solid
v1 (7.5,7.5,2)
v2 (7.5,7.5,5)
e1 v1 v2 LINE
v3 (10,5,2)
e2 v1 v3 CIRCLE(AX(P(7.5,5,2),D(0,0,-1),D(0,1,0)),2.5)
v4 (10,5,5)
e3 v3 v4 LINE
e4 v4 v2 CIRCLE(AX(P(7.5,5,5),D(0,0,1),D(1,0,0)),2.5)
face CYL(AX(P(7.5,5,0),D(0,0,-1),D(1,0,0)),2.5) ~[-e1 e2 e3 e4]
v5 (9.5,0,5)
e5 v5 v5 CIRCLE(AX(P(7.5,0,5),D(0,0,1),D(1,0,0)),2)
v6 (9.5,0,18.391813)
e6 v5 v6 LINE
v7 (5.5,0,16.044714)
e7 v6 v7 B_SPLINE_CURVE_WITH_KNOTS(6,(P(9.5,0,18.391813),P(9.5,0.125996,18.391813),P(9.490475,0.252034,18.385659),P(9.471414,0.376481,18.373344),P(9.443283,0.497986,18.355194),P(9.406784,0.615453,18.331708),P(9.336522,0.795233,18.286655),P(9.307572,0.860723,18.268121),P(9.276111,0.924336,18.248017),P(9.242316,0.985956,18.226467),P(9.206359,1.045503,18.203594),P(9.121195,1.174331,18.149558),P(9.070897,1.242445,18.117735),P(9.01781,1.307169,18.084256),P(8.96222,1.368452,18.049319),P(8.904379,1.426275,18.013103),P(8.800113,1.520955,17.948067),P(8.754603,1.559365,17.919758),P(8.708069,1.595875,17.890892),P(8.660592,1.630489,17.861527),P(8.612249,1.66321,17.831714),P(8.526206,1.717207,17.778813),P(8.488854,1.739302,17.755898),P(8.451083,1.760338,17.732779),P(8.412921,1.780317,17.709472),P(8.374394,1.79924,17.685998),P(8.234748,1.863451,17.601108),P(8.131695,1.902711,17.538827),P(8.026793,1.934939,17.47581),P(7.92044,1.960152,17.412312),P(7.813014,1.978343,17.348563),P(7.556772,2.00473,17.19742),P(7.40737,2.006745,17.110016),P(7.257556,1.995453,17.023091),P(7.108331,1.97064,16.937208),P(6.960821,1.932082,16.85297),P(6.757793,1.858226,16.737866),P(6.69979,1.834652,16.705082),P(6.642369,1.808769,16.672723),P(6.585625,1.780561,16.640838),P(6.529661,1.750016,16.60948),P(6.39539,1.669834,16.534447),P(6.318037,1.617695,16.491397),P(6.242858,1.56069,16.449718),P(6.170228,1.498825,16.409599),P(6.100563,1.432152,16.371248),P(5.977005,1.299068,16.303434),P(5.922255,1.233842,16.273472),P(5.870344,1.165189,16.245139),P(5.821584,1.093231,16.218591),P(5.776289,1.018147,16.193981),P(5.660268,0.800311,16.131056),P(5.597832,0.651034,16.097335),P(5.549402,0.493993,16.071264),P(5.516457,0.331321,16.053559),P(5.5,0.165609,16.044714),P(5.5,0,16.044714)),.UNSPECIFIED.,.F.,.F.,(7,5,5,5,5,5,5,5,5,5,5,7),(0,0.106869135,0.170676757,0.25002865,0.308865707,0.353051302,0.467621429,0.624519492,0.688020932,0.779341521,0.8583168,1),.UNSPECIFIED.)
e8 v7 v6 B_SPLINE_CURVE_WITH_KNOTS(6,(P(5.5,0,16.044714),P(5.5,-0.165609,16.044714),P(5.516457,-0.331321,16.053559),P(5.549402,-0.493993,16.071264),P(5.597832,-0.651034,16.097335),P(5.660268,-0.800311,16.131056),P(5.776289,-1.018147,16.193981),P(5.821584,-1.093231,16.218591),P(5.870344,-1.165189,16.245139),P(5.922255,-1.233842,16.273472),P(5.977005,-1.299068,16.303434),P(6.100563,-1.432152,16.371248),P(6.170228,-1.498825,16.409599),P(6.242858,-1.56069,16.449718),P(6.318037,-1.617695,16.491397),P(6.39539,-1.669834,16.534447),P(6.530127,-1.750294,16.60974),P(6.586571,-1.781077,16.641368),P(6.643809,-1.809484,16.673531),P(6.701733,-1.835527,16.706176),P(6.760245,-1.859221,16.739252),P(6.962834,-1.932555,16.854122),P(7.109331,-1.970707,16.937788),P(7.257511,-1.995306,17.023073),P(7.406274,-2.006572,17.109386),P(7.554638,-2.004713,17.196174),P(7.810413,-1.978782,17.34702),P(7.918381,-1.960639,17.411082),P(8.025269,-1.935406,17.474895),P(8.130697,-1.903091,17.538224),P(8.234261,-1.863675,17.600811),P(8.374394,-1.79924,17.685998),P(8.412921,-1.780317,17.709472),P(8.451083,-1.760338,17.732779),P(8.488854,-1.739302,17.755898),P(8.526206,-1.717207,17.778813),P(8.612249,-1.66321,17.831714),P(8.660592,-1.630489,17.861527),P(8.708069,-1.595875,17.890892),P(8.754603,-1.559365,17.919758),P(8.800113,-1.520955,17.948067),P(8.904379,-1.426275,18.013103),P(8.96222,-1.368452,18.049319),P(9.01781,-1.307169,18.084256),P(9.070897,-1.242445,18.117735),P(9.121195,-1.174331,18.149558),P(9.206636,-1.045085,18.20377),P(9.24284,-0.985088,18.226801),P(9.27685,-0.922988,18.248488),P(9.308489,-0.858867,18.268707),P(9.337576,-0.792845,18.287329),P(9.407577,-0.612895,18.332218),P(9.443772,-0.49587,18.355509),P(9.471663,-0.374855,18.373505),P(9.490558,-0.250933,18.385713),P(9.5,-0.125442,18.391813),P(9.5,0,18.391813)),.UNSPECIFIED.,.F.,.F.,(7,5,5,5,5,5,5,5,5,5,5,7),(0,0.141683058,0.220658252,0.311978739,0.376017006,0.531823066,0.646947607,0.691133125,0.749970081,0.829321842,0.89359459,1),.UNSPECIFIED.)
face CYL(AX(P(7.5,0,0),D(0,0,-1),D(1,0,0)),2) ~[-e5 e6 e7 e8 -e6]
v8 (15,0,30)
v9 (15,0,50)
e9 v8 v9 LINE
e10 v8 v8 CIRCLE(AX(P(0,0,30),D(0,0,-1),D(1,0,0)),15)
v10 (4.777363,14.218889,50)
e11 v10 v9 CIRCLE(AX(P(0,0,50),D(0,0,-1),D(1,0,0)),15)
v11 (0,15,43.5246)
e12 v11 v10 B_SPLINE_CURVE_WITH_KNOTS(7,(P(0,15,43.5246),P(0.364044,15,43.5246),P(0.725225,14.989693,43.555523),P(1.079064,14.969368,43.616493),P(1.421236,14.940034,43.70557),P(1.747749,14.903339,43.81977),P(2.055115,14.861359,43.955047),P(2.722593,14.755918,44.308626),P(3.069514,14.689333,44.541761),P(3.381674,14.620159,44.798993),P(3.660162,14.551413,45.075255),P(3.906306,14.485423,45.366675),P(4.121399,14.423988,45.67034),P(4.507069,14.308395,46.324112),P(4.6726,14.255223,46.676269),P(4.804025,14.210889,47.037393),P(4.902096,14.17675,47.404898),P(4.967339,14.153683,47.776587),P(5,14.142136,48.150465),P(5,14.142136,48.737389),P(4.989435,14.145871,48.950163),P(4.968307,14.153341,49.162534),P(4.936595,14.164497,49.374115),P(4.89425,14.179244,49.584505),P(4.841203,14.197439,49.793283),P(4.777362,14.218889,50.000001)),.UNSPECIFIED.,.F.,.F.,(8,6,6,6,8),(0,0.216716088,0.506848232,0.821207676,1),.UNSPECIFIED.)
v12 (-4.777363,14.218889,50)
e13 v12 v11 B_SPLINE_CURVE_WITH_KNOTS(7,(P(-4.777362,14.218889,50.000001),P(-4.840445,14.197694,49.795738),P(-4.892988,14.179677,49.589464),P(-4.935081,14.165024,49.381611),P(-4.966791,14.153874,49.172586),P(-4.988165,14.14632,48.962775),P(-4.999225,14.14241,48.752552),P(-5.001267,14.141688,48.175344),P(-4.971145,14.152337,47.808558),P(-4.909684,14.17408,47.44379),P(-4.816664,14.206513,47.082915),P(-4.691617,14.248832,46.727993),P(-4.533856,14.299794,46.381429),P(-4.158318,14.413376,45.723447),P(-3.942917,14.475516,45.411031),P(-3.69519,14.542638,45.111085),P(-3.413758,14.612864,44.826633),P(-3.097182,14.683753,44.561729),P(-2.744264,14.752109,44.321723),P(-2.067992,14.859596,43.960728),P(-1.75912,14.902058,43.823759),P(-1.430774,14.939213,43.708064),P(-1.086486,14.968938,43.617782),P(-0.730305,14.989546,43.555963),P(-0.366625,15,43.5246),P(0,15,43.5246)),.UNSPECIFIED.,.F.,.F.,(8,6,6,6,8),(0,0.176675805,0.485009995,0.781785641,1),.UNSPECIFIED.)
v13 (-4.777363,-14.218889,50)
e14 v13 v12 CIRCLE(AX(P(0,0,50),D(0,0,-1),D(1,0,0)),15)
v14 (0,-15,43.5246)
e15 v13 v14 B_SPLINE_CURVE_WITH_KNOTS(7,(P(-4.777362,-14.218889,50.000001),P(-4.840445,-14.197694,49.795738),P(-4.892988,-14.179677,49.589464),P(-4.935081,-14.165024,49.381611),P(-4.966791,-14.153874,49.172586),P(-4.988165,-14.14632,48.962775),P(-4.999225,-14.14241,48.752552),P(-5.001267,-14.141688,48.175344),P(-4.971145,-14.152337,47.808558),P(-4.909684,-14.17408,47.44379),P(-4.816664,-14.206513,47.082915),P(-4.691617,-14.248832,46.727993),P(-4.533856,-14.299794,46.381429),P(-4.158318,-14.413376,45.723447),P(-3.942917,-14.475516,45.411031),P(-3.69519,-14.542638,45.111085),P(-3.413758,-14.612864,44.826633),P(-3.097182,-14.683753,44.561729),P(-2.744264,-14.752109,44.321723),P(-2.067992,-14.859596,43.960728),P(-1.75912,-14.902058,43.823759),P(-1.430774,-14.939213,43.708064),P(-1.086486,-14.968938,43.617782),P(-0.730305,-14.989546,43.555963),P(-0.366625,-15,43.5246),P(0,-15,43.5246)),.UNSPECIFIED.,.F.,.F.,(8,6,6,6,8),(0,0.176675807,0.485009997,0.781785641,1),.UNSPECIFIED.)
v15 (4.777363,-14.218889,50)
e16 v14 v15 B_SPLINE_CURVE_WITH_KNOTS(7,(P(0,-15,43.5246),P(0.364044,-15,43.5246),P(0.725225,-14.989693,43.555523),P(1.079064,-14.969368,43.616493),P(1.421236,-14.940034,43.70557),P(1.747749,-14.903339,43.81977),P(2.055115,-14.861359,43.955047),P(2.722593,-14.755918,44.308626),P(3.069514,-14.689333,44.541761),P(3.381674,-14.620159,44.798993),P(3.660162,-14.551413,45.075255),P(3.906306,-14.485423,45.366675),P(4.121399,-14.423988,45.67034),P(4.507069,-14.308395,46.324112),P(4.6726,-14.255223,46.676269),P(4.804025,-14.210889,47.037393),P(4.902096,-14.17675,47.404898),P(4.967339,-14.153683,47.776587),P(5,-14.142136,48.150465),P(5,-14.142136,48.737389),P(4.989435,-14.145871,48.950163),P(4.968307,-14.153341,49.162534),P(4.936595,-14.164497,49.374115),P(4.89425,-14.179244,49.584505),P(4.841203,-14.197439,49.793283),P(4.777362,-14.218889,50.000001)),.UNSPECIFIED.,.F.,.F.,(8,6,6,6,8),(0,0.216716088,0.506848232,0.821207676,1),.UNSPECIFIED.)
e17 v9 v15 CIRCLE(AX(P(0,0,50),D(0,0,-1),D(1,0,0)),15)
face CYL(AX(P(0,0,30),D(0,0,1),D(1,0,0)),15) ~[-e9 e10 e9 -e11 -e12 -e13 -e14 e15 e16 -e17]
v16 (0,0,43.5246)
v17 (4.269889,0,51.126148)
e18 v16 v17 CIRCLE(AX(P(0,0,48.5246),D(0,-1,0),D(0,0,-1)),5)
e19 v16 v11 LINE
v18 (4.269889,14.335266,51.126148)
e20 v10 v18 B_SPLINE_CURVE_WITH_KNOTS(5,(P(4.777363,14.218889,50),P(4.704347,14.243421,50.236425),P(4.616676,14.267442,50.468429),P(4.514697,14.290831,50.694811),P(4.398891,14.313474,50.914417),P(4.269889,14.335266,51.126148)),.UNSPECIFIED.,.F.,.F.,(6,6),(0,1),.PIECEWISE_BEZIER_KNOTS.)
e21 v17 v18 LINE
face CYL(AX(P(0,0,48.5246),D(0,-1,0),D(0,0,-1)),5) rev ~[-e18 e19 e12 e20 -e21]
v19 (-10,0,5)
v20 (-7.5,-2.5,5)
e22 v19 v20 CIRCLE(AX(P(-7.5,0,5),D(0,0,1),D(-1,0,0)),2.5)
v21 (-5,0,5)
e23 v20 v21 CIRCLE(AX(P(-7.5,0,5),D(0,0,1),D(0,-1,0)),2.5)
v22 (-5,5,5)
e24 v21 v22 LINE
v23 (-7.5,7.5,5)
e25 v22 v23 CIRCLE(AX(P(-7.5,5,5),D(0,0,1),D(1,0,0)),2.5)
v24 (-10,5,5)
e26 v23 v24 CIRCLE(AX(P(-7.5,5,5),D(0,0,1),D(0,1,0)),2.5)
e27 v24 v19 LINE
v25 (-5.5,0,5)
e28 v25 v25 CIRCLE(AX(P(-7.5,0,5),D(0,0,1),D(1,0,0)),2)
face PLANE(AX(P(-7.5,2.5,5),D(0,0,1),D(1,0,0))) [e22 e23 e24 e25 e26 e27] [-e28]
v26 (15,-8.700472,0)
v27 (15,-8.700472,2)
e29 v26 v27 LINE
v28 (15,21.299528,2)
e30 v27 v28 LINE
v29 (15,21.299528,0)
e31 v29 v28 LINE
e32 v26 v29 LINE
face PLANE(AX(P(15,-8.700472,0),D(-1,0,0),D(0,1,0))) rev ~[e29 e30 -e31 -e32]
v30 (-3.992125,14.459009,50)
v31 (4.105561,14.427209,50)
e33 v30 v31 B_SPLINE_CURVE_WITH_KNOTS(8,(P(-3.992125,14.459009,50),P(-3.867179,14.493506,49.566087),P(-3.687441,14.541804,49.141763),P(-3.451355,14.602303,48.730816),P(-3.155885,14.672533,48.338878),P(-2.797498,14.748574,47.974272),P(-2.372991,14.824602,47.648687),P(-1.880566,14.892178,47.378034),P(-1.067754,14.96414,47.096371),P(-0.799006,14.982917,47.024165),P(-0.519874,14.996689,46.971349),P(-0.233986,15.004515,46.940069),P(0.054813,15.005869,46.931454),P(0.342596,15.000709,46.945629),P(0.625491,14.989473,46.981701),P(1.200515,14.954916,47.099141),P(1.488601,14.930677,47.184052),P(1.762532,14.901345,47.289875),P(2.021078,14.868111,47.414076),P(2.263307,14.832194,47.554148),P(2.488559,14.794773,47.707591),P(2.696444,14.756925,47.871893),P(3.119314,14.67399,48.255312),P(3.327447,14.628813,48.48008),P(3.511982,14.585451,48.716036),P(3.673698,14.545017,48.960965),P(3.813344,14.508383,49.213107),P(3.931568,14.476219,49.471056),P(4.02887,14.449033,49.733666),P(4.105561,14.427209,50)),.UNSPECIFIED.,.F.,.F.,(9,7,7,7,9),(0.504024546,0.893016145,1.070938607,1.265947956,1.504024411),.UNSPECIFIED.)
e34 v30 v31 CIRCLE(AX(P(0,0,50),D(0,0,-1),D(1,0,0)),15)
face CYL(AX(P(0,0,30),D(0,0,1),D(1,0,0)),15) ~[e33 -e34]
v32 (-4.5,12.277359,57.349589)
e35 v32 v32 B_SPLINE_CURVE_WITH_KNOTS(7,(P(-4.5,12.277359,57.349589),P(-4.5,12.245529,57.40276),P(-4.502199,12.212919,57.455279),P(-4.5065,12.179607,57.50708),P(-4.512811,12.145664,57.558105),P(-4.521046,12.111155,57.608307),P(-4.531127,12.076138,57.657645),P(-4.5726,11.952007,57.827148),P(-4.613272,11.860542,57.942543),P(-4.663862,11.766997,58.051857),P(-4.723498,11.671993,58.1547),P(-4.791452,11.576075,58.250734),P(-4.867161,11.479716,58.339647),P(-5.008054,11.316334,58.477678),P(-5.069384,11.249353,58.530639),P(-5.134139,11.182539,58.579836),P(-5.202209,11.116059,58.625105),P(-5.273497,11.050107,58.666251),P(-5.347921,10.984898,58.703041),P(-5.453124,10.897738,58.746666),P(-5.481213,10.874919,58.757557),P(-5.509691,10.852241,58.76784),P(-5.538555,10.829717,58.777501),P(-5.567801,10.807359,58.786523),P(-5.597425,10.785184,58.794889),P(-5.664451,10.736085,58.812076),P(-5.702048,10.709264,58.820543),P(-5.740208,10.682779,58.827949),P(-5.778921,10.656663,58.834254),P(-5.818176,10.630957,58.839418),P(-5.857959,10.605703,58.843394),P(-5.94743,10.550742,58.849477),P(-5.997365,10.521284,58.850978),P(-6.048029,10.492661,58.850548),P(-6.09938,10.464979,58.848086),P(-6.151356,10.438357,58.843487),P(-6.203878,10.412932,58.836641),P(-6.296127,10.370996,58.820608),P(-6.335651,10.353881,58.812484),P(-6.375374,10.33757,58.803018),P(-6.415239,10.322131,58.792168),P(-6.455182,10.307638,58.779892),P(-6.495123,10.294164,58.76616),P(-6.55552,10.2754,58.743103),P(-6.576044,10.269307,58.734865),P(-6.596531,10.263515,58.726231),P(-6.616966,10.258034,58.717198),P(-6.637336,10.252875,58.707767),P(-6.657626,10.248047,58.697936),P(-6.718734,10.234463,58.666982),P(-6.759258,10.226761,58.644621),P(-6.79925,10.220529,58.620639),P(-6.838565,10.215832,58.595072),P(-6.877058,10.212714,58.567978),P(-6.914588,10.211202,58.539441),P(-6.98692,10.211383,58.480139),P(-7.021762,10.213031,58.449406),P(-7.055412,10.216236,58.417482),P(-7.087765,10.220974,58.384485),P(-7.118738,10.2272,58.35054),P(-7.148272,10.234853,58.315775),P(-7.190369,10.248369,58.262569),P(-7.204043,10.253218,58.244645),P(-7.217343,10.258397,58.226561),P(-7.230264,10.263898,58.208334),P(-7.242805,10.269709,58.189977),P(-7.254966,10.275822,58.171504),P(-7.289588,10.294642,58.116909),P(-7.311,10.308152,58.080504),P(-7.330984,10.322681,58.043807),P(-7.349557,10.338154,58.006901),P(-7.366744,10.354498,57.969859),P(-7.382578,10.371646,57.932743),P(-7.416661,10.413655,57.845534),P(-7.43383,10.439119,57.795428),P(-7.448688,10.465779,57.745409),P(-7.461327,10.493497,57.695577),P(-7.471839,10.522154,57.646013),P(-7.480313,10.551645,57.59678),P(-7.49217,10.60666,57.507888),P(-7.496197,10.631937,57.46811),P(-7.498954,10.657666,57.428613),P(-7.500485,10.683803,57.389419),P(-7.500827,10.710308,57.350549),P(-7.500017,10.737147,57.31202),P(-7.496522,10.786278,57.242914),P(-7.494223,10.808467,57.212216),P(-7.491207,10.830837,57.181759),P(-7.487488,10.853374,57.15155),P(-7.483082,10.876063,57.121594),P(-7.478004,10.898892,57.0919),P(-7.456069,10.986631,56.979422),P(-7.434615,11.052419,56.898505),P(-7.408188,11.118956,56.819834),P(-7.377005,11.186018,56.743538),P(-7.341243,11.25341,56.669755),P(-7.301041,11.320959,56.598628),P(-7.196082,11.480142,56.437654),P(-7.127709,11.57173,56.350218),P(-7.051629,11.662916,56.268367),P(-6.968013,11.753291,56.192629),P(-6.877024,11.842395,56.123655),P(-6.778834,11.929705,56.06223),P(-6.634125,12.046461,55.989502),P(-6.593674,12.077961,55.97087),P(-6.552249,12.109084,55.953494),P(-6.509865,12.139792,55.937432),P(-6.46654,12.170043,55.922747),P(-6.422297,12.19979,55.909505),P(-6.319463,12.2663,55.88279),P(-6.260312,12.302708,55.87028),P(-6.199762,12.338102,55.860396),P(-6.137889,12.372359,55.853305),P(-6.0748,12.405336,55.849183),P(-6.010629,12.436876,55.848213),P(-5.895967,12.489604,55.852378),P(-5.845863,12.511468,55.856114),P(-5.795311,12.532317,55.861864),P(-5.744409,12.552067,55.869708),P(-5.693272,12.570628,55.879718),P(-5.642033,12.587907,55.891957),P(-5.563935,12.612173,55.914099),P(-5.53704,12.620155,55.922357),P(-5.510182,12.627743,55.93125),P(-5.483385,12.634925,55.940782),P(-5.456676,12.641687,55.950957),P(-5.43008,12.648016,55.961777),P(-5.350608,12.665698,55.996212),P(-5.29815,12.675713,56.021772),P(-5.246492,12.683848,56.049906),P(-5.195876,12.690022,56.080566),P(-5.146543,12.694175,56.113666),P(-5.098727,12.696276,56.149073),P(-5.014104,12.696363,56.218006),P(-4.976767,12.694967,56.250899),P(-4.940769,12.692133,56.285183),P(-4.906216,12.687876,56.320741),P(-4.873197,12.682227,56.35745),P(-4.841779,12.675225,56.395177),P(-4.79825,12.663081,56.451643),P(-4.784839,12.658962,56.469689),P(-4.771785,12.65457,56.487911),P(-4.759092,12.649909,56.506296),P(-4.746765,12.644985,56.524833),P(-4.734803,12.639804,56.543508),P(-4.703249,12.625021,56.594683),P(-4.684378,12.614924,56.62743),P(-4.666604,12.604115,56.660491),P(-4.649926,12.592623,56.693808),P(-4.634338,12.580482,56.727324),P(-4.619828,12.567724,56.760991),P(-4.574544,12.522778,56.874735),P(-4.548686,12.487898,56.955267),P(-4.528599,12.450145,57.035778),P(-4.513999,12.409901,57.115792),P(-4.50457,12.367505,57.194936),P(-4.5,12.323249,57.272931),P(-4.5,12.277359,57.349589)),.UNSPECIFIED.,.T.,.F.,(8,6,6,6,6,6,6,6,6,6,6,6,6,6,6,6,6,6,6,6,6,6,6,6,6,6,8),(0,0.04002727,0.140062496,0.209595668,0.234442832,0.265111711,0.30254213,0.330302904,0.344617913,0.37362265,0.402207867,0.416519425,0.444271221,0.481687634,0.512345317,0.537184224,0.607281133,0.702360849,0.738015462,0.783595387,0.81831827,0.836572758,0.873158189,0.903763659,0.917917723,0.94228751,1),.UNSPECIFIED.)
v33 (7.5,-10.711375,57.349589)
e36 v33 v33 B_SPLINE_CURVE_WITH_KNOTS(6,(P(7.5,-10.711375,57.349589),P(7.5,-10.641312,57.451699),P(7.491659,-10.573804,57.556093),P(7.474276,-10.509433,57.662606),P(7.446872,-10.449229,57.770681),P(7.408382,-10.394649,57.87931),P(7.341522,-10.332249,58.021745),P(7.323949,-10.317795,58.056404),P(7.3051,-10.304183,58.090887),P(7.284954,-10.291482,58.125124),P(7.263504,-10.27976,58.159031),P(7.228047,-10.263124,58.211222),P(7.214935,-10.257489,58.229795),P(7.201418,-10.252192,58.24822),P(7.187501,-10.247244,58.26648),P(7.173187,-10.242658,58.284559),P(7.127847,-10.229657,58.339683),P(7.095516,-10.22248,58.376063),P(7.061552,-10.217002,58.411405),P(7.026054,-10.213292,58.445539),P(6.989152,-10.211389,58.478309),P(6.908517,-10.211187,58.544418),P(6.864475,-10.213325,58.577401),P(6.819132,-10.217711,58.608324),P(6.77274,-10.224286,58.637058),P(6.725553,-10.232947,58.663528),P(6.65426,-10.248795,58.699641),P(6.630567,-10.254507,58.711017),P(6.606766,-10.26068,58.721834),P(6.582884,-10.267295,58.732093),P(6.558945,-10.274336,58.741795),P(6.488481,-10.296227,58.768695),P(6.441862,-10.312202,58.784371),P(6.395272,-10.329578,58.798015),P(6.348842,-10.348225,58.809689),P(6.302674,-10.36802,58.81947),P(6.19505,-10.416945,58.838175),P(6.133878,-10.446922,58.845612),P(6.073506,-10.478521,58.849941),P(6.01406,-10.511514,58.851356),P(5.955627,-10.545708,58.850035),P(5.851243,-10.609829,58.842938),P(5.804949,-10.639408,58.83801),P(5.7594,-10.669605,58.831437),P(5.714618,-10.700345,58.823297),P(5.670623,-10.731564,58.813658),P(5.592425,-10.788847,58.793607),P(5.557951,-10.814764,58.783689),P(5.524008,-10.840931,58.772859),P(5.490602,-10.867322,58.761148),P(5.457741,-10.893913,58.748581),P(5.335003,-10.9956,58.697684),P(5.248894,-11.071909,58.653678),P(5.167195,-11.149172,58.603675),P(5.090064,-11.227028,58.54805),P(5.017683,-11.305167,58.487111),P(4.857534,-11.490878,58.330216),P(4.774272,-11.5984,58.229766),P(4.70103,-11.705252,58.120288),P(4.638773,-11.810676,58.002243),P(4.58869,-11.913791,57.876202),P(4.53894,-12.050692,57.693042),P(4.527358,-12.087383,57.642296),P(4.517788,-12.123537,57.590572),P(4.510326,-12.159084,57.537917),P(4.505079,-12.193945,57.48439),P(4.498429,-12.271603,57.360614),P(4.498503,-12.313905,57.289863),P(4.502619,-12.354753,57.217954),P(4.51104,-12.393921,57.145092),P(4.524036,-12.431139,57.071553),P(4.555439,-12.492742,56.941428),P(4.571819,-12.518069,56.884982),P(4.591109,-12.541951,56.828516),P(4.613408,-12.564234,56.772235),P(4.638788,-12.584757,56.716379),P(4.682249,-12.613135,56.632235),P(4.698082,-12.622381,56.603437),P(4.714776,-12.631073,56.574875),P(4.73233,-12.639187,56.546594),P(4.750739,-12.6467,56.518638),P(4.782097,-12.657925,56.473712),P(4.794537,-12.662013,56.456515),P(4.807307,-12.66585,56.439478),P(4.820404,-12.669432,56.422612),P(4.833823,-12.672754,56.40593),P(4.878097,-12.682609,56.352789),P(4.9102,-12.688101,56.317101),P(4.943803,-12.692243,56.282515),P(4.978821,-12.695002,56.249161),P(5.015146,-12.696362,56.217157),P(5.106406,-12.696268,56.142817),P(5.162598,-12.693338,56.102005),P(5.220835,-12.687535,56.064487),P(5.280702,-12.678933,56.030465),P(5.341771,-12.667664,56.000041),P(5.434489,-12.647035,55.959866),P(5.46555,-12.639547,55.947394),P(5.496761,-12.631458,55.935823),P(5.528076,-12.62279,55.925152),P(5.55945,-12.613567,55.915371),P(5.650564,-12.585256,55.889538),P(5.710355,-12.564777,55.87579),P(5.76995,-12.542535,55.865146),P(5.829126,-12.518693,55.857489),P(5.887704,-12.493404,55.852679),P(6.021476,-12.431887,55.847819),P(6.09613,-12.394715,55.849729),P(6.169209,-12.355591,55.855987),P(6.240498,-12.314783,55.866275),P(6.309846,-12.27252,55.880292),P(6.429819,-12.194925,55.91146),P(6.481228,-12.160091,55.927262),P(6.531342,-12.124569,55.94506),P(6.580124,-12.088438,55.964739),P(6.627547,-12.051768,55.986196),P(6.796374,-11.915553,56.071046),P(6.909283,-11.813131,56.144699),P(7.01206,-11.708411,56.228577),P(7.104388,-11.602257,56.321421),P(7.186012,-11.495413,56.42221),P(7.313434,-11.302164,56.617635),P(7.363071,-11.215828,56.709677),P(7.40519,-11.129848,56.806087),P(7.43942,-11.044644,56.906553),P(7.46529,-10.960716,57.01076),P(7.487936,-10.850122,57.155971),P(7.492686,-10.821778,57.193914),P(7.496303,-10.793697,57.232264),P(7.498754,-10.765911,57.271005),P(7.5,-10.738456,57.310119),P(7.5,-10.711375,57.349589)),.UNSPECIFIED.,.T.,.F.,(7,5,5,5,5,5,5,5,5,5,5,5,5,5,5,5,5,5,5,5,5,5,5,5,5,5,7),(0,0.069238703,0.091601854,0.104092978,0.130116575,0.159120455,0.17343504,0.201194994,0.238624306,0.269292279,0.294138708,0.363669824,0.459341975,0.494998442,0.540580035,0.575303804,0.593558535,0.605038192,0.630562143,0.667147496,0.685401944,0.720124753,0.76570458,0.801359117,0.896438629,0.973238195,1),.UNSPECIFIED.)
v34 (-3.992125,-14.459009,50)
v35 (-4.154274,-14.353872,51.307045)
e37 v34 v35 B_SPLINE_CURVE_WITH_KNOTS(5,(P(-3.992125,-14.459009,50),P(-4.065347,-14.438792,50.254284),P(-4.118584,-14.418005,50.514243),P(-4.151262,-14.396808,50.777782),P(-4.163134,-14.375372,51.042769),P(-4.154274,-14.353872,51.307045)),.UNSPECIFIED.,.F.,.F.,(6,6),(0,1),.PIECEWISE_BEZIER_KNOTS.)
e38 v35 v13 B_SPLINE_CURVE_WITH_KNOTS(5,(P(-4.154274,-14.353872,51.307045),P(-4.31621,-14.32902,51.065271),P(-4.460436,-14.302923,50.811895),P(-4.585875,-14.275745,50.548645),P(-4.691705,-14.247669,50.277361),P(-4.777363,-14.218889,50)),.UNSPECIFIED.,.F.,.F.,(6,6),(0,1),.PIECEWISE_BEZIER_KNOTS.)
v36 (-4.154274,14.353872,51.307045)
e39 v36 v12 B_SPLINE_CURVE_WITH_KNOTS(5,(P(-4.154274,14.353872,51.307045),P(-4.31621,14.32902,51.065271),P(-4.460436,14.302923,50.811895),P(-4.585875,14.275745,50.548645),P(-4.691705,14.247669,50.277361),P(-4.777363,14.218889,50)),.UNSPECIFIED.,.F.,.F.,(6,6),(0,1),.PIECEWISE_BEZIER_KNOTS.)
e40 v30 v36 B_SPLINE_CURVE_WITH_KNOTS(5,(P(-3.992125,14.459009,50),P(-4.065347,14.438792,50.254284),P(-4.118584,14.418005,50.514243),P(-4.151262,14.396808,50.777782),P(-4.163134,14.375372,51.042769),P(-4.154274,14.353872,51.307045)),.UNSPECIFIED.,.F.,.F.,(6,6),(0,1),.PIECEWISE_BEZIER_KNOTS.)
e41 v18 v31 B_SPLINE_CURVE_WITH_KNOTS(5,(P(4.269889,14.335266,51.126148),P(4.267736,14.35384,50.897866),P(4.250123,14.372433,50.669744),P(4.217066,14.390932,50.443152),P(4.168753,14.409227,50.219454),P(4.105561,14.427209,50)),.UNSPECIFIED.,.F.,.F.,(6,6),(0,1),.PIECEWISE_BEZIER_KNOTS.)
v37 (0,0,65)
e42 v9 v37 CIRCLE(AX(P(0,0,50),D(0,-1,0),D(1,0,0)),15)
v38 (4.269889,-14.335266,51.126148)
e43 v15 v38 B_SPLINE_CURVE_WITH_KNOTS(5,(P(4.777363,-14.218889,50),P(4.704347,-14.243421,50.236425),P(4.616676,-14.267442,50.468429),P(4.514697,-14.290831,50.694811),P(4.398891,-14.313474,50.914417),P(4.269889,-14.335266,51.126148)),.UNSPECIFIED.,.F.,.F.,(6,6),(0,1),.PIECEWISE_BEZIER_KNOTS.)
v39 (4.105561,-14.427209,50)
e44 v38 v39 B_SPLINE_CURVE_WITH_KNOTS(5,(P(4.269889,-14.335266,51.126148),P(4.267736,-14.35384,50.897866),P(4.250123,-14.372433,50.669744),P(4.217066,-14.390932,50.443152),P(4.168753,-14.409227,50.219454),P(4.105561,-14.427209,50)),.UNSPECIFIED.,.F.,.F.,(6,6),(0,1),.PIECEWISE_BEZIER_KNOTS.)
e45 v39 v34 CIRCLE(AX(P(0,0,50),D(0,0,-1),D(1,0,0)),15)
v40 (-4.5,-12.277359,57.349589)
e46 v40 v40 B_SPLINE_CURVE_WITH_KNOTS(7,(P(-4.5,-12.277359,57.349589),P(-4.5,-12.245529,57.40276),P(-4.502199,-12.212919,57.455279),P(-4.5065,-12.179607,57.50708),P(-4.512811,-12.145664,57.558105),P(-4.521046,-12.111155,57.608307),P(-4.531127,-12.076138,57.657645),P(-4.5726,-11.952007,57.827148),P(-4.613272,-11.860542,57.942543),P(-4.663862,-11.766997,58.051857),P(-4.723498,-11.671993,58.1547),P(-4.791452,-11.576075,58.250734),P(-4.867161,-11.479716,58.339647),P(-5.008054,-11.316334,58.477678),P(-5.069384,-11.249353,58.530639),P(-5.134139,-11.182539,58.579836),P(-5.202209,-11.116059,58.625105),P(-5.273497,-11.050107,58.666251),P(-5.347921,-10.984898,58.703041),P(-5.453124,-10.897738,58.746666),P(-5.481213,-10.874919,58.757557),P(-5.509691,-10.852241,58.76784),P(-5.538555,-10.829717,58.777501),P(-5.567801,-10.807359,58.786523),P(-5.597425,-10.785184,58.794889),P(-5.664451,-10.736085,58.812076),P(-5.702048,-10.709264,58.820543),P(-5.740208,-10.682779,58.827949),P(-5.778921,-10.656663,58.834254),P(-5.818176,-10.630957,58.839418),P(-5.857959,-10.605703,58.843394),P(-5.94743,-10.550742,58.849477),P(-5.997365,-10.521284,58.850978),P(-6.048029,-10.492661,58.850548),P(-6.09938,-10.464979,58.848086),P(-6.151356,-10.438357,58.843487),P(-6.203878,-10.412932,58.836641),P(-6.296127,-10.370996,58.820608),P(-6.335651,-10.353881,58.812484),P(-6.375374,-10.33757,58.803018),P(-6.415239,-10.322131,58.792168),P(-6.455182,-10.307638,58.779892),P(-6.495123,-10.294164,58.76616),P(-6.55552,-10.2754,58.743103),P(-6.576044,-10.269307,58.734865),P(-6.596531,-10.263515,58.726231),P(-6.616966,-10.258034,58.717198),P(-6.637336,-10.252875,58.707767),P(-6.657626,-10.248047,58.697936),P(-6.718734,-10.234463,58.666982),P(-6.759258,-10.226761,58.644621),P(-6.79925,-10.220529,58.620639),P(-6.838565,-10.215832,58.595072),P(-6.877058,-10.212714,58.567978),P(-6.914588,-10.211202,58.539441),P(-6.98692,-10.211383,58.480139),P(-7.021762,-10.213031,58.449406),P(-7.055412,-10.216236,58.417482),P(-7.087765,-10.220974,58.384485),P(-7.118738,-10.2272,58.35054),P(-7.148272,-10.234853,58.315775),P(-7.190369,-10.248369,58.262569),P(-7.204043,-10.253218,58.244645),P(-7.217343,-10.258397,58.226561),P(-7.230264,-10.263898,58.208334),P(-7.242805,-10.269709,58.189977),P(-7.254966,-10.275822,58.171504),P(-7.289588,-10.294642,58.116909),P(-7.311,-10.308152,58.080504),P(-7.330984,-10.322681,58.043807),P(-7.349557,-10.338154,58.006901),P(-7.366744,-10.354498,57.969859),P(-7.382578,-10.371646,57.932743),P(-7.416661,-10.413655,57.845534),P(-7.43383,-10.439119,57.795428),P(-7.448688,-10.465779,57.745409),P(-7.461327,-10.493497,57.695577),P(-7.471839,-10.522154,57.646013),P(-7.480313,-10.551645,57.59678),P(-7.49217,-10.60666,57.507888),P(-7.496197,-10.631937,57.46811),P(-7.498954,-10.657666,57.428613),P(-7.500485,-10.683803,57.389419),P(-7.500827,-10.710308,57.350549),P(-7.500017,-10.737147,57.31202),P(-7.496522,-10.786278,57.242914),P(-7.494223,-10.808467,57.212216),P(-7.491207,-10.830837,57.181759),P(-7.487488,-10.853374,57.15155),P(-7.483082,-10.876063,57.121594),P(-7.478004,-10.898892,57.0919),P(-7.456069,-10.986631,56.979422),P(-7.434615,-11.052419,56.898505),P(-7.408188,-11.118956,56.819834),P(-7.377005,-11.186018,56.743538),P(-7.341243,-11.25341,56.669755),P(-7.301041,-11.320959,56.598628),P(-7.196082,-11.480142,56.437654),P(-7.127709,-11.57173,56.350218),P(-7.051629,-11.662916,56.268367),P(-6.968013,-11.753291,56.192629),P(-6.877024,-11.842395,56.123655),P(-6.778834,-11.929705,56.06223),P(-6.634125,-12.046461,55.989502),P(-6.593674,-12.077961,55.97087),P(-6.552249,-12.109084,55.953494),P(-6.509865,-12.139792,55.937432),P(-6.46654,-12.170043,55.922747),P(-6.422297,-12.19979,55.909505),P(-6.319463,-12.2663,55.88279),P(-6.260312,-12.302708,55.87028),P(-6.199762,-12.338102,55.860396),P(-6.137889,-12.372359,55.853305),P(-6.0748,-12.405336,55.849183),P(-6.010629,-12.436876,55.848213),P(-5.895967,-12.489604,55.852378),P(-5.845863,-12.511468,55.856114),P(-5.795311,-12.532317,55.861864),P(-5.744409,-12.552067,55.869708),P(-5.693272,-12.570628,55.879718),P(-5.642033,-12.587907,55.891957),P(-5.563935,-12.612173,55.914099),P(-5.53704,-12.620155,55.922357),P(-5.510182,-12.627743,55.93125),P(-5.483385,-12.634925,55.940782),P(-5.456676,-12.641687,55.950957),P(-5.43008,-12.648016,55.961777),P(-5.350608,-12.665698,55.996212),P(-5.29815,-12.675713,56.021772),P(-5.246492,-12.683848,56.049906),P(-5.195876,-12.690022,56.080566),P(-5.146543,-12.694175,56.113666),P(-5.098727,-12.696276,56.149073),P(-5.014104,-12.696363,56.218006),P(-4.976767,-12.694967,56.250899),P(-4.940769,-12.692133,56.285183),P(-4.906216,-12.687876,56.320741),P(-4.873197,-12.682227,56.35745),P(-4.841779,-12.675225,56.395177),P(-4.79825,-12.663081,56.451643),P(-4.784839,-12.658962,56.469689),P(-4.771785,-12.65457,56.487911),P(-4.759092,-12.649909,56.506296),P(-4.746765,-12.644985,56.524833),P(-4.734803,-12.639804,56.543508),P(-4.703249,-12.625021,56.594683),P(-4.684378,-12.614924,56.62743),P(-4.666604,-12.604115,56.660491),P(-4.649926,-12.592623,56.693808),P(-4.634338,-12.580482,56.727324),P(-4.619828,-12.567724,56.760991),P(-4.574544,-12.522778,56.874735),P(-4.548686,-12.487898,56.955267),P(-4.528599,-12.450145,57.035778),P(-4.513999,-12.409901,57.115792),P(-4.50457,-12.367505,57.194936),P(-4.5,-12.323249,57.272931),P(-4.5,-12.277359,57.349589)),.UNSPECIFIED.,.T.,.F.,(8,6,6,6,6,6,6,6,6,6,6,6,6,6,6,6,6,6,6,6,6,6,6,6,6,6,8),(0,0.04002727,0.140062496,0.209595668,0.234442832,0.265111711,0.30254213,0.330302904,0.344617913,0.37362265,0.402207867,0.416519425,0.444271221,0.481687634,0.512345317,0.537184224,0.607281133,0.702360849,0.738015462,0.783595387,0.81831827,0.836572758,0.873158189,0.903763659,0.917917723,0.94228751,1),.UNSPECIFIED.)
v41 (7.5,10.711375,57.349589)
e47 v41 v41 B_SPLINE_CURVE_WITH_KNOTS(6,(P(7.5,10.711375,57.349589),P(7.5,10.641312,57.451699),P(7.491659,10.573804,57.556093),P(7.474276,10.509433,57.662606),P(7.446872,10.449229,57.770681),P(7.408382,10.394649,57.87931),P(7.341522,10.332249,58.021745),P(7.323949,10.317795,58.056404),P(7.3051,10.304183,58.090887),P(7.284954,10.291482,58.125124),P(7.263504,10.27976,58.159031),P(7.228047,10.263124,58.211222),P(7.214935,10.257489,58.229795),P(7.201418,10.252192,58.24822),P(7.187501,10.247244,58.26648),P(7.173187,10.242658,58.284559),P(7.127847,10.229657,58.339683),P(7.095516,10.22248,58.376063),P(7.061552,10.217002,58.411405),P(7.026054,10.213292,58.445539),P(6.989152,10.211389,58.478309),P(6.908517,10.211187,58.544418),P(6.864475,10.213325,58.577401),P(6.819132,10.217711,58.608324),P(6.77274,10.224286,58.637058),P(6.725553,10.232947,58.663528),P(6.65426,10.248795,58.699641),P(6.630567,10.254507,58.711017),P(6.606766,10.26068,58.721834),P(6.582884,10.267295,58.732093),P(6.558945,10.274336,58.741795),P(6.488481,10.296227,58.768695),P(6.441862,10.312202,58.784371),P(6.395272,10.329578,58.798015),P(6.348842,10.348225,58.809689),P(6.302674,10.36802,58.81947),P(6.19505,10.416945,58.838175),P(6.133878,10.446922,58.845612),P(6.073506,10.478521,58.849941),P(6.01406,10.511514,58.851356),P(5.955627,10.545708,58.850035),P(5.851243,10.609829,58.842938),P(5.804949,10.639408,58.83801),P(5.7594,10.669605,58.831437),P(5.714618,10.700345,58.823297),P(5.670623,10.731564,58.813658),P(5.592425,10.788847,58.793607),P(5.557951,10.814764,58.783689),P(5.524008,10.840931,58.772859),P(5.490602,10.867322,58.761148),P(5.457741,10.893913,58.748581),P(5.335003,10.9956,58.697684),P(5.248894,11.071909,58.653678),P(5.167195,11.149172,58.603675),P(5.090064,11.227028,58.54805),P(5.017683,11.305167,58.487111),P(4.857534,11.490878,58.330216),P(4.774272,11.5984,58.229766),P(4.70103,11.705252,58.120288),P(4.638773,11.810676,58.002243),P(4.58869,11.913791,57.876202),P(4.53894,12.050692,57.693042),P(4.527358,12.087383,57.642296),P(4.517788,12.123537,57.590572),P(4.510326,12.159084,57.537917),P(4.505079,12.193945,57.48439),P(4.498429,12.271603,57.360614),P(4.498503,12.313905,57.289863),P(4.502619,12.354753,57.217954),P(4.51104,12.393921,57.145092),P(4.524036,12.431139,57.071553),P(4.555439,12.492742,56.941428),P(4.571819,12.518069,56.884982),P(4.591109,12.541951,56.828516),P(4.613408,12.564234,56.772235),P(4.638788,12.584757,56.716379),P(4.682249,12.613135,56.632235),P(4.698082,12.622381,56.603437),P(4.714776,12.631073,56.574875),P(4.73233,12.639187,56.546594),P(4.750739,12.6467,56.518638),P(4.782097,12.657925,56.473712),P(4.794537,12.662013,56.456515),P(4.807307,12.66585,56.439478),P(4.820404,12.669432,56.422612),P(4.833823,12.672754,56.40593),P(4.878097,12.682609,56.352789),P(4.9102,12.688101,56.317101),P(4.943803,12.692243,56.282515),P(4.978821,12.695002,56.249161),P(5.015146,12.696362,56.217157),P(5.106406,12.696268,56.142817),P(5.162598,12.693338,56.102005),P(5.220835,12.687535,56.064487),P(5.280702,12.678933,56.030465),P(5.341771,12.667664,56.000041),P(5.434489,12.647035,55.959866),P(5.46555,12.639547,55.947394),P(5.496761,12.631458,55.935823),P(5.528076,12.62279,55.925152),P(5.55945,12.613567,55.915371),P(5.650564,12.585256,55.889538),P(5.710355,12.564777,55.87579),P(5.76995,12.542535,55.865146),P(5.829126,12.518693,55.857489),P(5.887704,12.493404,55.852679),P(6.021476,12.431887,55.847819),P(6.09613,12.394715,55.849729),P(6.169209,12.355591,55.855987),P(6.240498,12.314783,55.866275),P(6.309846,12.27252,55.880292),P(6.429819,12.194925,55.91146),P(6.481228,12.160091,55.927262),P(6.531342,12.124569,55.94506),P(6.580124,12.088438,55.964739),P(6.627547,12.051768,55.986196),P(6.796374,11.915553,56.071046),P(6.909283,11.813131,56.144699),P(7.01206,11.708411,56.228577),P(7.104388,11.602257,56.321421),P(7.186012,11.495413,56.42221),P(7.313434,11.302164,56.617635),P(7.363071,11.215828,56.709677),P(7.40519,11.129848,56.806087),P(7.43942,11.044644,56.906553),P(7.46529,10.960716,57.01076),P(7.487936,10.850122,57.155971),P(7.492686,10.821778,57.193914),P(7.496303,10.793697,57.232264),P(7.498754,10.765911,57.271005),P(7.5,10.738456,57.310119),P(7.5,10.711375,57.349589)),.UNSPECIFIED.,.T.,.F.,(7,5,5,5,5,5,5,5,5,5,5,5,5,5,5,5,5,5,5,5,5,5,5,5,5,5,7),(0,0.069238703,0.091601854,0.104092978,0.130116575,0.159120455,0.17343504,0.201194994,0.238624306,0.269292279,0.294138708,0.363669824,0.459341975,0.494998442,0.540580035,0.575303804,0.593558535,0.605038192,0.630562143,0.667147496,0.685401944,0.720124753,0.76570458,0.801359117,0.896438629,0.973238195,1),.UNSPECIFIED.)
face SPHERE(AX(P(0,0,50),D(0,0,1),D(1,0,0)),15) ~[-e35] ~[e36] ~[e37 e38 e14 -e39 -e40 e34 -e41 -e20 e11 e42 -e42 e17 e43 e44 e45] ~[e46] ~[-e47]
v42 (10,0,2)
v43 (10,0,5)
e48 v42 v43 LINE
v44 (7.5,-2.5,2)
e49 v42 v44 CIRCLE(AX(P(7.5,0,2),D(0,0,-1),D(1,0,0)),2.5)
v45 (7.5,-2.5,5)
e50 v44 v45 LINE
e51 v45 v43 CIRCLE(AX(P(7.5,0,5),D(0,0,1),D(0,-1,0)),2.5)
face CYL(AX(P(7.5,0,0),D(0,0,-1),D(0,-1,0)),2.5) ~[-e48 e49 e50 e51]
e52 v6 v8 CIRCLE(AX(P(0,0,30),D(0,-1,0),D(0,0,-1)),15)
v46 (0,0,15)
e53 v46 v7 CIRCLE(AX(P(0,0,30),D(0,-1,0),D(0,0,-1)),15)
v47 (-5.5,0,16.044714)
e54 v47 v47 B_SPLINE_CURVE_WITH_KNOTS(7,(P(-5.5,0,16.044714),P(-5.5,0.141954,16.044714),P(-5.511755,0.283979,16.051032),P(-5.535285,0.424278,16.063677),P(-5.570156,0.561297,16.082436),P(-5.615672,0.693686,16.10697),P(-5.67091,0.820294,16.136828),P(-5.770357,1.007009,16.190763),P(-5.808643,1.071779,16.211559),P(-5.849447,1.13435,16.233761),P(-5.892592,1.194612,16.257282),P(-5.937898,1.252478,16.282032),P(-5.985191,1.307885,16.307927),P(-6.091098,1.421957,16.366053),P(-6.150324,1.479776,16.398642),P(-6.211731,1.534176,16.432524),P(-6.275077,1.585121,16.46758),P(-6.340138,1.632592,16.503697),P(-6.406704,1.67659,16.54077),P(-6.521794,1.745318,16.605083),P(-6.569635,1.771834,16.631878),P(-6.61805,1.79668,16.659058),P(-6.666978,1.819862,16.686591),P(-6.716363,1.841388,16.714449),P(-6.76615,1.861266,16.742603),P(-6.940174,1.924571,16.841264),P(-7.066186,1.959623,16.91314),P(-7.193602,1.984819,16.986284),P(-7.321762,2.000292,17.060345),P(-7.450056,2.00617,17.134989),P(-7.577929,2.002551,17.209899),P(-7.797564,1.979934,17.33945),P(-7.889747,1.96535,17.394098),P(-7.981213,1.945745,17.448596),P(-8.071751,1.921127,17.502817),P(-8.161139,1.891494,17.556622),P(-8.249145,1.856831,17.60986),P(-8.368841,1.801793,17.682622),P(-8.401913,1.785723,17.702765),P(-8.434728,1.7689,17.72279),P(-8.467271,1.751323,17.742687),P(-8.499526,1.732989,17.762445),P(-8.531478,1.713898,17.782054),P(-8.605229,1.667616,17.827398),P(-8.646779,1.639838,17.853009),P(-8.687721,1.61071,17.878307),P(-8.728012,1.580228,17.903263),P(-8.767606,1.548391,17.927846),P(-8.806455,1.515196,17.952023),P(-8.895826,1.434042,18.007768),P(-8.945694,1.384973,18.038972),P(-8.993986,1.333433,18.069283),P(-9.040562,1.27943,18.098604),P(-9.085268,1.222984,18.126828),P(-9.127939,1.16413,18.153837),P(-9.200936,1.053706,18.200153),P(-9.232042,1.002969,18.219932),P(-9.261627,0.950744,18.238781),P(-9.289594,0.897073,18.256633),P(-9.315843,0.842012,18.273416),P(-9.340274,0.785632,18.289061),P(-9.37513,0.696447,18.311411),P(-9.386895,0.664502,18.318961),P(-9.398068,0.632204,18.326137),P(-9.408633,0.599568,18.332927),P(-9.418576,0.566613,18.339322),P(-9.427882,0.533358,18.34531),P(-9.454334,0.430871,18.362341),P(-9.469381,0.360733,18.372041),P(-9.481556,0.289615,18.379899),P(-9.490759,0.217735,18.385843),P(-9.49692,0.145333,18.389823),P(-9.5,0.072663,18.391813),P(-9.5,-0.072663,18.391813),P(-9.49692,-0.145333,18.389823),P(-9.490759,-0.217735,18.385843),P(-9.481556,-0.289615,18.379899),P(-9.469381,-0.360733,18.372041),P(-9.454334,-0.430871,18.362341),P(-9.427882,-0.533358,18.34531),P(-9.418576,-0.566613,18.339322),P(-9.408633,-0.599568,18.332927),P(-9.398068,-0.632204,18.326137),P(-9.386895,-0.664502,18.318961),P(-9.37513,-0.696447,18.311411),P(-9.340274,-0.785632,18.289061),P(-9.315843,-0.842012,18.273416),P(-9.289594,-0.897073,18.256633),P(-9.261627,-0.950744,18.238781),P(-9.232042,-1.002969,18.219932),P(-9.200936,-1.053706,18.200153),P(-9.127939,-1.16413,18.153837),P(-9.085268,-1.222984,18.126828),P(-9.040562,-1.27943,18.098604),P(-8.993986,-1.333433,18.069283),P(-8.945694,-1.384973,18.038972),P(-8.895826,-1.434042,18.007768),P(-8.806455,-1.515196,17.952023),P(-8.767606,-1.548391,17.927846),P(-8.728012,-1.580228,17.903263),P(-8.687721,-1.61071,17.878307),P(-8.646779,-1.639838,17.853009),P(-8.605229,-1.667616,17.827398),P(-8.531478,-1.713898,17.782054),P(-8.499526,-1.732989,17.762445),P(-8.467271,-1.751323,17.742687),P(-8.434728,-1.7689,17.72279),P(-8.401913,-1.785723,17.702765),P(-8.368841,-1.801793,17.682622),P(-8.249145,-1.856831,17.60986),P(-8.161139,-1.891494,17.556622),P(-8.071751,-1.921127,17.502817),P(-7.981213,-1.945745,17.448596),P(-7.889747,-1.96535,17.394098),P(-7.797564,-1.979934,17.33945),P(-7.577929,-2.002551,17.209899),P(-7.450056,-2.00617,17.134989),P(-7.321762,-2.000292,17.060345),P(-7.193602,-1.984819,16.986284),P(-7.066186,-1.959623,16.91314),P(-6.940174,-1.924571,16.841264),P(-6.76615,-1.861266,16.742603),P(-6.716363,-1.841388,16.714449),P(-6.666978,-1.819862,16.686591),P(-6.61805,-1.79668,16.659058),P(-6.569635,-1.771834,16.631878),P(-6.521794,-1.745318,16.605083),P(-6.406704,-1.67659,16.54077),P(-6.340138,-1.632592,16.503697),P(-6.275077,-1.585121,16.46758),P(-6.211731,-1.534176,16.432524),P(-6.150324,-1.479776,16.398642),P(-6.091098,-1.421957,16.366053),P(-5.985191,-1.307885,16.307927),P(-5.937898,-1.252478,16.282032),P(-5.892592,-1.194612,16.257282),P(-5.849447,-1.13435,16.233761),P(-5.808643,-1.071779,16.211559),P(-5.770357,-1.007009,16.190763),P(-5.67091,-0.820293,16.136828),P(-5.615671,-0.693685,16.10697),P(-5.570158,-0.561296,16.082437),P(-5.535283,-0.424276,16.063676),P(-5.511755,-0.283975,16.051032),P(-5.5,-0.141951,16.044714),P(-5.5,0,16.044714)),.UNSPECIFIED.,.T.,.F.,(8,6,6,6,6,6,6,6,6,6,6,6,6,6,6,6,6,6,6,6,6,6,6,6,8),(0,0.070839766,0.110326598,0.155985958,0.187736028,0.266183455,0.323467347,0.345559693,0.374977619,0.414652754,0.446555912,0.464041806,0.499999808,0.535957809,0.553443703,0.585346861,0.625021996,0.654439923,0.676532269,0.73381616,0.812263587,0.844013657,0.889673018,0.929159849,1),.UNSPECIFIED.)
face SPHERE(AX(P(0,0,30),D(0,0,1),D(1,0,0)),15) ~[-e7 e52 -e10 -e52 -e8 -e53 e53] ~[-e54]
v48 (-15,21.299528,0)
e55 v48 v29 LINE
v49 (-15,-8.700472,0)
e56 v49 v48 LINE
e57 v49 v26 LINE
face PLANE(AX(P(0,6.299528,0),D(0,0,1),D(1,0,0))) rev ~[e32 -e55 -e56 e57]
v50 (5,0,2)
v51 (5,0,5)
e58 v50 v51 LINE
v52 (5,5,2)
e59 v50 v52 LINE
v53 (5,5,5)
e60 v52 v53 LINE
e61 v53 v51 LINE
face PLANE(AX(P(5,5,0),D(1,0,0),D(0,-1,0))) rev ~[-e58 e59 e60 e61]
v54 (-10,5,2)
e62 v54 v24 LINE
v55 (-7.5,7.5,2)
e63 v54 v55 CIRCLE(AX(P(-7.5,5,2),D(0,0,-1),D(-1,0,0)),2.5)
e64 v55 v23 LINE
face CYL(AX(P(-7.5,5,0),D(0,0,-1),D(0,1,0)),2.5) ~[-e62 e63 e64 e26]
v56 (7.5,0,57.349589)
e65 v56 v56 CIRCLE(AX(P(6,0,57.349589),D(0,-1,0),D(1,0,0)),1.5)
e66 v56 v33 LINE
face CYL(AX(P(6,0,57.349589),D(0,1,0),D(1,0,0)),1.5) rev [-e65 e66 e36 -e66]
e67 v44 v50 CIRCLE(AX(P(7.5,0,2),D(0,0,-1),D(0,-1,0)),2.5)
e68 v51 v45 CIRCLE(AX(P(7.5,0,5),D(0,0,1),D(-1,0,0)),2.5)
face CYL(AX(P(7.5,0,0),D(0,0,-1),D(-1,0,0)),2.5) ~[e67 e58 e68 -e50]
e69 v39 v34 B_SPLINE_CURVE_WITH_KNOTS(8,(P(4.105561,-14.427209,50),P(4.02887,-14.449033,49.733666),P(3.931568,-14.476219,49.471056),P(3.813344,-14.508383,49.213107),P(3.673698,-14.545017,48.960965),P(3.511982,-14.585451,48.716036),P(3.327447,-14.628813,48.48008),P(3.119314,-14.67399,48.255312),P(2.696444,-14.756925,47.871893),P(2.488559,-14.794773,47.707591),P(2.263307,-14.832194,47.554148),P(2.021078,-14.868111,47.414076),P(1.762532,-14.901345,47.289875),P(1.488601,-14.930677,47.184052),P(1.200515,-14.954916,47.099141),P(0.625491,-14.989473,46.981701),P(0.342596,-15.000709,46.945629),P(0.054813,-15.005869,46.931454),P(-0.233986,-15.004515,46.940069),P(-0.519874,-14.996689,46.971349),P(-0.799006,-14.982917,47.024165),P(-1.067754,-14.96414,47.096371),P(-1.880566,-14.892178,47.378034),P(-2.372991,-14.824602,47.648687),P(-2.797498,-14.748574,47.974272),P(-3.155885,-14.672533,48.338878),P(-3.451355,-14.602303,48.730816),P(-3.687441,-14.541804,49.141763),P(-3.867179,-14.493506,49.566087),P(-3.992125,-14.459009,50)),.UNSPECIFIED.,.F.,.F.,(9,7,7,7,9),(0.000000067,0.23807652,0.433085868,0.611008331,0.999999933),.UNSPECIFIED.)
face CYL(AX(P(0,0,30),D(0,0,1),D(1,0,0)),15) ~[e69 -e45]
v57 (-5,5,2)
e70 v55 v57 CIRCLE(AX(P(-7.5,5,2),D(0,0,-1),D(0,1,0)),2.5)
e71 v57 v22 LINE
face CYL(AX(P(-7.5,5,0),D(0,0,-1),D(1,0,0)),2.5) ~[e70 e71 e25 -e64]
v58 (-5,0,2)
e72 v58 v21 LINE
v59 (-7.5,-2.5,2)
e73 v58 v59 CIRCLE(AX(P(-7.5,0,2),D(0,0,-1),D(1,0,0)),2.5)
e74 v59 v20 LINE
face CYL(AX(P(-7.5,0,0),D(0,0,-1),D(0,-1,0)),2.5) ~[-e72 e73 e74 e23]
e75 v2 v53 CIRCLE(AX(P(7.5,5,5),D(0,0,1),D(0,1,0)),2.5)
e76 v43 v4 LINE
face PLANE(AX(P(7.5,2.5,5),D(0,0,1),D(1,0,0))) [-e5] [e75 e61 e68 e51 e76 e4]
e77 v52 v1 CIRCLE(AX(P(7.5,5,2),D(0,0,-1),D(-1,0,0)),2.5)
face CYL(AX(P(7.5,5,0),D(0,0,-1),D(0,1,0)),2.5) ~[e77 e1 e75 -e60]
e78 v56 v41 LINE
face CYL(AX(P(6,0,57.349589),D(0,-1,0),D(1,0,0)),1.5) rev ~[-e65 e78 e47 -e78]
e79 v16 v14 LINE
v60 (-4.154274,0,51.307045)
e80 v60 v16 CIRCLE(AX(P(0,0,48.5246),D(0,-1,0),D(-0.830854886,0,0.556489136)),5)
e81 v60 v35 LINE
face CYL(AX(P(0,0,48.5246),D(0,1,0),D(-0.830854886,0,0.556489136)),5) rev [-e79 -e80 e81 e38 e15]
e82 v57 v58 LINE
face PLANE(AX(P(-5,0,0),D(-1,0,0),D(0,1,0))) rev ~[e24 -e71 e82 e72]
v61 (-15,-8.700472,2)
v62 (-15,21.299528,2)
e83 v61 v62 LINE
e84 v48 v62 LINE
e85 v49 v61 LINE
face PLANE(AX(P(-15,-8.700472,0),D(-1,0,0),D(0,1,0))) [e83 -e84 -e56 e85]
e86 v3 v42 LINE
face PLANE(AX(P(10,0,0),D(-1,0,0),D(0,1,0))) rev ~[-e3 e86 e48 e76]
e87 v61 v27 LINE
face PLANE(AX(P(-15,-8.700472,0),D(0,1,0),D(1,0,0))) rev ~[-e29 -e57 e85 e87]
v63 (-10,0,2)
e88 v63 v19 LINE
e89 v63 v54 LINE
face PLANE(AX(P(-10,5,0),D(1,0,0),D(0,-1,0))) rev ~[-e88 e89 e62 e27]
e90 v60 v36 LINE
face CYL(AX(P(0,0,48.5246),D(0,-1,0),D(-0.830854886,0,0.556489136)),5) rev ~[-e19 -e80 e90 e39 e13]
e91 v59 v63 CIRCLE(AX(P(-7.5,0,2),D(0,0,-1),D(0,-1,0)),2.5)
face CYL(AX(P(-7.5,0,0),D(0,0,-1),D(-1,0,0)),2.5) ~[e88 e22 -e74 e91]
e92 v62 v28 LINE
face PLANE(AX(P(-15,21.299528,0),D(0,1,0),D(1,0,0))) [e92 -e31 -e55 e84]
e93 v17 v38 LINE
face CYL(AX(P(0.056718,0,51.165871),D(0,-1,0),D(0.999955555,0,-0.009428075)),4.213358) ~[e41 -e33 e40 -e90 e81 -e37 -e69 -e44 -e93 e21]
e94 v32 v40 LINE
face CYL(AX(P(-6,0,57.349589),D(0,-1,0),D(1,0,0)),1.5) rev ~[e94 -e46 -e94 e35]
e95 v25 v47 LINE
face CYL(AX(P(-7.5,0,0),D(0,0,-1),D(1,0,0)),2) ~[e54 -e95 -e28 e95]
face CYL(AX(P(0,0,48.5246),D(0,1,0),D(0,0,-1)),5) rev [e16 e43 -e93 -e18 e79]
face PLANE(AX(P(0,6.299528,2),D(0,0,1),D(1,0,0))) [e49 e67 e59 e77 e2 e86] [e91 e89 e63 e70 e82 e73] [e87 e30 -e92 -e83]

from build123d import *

# Parameters (mm, degrees)
F0_W     = 30
F0_H     = 30
F1_DEPTH = 2
F0_R     = 2
F3_DEPTH = 5
F4_DEPTH = 25
F2_R     = 1.5
F6_DEPTH = 15
F7_DEPTH = 15


# Not quite as in the source:
# - a feature names something its author has since deleted; it is built from what else it names


with BuildPart() as f1:
    # F0 (on Top) → F1 (new body)
    with BuildSketch(Plane.XY):
        with Locations((0, 6.2995284576)):
            Rectangle(F0_W, F0_H)
        with BuildLine():
            ThreePointArc((-10, 5), (-9.267766953, 6.767766953), (-7.5, 7.5))
            ThreePointArc((-7.5, 7.5), (-5.732233047, 6.767766953), (-5, 5))
            Line((-5, 5), (-5, 0))
            ThreePointArc((-5, 0), (-5.732233047, -1.767766953), (-7.5, -2.5))
            ThreePointArc((-7.5, -2.5), (-9.267766953, -1.767766953), (-10, 0))
            Line((-10, 0), (-10, 5))
        make_face(mode=Mode.SUBTRACT)
        with BuildLine():
            Line((5, 0), (5, 5))
            ThreePointArc((5, 5), (5.732233047, 6.767766953), (7.5, 7.5))
            ThreePointArc((7.5, 7.5), (9.267766953, 6.767766953), (10, 5))
            Line((10, 5), (10, 0))
            ThreePointArc((10, 0), (9.267766953, -1.767766953), (7.5, -2.5))
            ThreePointArc((7.5, -2.5), (5.732233047, -1.767766953), (5, 0))
        make_face(mode=Mode.SUBTRACT)
    extrude(amount=F1_DEPTH)

    # F0 (on Top) → F3 (join)
    with BuildSketch(Plane.XY):
        with BuildLine():
            ThreePointArc((7.5, 7.5), (5.732233047, 6.767766953), (5, 5))
            Line((5, 5), (5, 0))
            ThreePointArc((5, 0), (5.732233047, -1.767766953), (7.5, -2.5))
            ThreePointArc((7.5, -2.5), (9.267766953, -1.767766953), (10, 0))
            Line((10, 0), (10, 5))
            ThreePointArc((10, 5), (9.267766953, 6.767766953), (7.5, 7.5))
        make_face()
        with Locations((7.5, 0)):
            Circle(F0_R, mode=Mode.SUBTRACT)
        with BuildLine():
            ThreePointArc((-5, 5), (-5.732233047, 6.767766953), (-7.5, 7.5))
            ThreePointArc((-7.5, 7.5), (-9.267766953, 6.767766953), (-10, 5))
            Line((-10, 5), (-10, 0))
            ThreePointArc((-10, 0), (-9.267766953, -1.767766953), (-7.5, -2.5))
            ThreePointArc((-7.5, -2.5), (-5.732233047, -1.767766953), (-5, 0))
            Line((-5, 0), (-5, 5))
        make_face()
        with Locations((-7.5, 0)):
            Circle(F0_R, mode=Mode.SUBTRACT)
    extrude(amount=F3_DEPTH)

    # F0 (on Top) → F4 (join)
    with BuildSketch(Plane.XY):
        with Locations((7.5, 0)):
            Circle(F0_R)
        with Locations((-7.5, 0)):
            Circle(F0_R)
    extrude(amount=F4_DEPTH)

    # F2 (on Front) → F5 (revolve)
    with BuildSketch(Plane.XZ):
        with BuildLine():
            ThreePointArc((15, 50), (10.6066017178, 60.6066017178), (0, 65))
            Line((0, 65), (0, 46.9528951543))
            ThreePointArc((0, 46.9528951543), (3.0017193367, 48.1526751529), (4.2698885231, 51.1261475231))
            ThreePointArc((4.2698885231, 51.1261475231), (4.3593428406, 46.0758998678), (0, 43.5245995224))
            Line((0, 43.5245995224), (0, 15))
            ThreePointArc((0, 15), (10.6066017178, 19.3933982822), (15, 30))
            Line((15, 30), (15, 50))
        make_face()
        with Locations((6, 57.3495886624)):
            Circle(F2_R, mode=Mode.SUBTRACT)
        with Locations((6, 57.3495886624)):
            Circle(F2_R)
        with BuildLine():
            ThreePointArc((4.2698885231, 51.1261475231), (3.0017193367, 48.1526751529), (0, 46.9528951543))
            Line((0, 46.9528951543), (0, 43.5245995224))
            ThreePointArc((0, 43.5245995224), (4.3593428406, 46.0758998678), (4.2698885231, 51.1261475231))
        make_face()
    revolve(axis=Axis((0, 0, 40), (0, 0, -1)))

    # F2 (on Front) → F6 (cut, symmetric)
    with BuildSketch(Plane.XZ):
        with Locations((6, 57.3495886624)):
            Circle(F2_R)
        with Locations((-6, 57.3495886624)):
            Circle(F2_R)
    extrude(amount=F6_DEPTH, both=True, mode=Mode.SUBTRACT)

    # F2 (on Front) → F7 (cut, symmetric)
    with BuildSketch(Plane.XZ):
        with BuildLine():
            ThreePointArc((4.2698885231, 51.1261475231), (3.0017193367, 48.1526751529), (0, 46.9528951543))
            Line((0, 46.9528951543), (0, 43.5245995224))
            ThreePointArc((0, 43.5245995224), (4.3593428406, 46.0758998678), (4.2698885231, 51.1261475231))
        make_face()
        with BuildLine():
            Line((0, 43.5245995224), (0, 46.9528951543))
            ThreePointArc((0, 46.9528951543), (-2.9917232596, 48.2573678623), (-4.1542744288, 51.3070452037))
            ThreePointArc((-4.1542744288, 51.3070452037), (-4.4109085463, 46.1700537495), (0, 43.5245995224))
        make_face()
    extrude(amount=F7_DEPTH, both=True, mode=Mode.SUBTRACT)


solid = f1.part
